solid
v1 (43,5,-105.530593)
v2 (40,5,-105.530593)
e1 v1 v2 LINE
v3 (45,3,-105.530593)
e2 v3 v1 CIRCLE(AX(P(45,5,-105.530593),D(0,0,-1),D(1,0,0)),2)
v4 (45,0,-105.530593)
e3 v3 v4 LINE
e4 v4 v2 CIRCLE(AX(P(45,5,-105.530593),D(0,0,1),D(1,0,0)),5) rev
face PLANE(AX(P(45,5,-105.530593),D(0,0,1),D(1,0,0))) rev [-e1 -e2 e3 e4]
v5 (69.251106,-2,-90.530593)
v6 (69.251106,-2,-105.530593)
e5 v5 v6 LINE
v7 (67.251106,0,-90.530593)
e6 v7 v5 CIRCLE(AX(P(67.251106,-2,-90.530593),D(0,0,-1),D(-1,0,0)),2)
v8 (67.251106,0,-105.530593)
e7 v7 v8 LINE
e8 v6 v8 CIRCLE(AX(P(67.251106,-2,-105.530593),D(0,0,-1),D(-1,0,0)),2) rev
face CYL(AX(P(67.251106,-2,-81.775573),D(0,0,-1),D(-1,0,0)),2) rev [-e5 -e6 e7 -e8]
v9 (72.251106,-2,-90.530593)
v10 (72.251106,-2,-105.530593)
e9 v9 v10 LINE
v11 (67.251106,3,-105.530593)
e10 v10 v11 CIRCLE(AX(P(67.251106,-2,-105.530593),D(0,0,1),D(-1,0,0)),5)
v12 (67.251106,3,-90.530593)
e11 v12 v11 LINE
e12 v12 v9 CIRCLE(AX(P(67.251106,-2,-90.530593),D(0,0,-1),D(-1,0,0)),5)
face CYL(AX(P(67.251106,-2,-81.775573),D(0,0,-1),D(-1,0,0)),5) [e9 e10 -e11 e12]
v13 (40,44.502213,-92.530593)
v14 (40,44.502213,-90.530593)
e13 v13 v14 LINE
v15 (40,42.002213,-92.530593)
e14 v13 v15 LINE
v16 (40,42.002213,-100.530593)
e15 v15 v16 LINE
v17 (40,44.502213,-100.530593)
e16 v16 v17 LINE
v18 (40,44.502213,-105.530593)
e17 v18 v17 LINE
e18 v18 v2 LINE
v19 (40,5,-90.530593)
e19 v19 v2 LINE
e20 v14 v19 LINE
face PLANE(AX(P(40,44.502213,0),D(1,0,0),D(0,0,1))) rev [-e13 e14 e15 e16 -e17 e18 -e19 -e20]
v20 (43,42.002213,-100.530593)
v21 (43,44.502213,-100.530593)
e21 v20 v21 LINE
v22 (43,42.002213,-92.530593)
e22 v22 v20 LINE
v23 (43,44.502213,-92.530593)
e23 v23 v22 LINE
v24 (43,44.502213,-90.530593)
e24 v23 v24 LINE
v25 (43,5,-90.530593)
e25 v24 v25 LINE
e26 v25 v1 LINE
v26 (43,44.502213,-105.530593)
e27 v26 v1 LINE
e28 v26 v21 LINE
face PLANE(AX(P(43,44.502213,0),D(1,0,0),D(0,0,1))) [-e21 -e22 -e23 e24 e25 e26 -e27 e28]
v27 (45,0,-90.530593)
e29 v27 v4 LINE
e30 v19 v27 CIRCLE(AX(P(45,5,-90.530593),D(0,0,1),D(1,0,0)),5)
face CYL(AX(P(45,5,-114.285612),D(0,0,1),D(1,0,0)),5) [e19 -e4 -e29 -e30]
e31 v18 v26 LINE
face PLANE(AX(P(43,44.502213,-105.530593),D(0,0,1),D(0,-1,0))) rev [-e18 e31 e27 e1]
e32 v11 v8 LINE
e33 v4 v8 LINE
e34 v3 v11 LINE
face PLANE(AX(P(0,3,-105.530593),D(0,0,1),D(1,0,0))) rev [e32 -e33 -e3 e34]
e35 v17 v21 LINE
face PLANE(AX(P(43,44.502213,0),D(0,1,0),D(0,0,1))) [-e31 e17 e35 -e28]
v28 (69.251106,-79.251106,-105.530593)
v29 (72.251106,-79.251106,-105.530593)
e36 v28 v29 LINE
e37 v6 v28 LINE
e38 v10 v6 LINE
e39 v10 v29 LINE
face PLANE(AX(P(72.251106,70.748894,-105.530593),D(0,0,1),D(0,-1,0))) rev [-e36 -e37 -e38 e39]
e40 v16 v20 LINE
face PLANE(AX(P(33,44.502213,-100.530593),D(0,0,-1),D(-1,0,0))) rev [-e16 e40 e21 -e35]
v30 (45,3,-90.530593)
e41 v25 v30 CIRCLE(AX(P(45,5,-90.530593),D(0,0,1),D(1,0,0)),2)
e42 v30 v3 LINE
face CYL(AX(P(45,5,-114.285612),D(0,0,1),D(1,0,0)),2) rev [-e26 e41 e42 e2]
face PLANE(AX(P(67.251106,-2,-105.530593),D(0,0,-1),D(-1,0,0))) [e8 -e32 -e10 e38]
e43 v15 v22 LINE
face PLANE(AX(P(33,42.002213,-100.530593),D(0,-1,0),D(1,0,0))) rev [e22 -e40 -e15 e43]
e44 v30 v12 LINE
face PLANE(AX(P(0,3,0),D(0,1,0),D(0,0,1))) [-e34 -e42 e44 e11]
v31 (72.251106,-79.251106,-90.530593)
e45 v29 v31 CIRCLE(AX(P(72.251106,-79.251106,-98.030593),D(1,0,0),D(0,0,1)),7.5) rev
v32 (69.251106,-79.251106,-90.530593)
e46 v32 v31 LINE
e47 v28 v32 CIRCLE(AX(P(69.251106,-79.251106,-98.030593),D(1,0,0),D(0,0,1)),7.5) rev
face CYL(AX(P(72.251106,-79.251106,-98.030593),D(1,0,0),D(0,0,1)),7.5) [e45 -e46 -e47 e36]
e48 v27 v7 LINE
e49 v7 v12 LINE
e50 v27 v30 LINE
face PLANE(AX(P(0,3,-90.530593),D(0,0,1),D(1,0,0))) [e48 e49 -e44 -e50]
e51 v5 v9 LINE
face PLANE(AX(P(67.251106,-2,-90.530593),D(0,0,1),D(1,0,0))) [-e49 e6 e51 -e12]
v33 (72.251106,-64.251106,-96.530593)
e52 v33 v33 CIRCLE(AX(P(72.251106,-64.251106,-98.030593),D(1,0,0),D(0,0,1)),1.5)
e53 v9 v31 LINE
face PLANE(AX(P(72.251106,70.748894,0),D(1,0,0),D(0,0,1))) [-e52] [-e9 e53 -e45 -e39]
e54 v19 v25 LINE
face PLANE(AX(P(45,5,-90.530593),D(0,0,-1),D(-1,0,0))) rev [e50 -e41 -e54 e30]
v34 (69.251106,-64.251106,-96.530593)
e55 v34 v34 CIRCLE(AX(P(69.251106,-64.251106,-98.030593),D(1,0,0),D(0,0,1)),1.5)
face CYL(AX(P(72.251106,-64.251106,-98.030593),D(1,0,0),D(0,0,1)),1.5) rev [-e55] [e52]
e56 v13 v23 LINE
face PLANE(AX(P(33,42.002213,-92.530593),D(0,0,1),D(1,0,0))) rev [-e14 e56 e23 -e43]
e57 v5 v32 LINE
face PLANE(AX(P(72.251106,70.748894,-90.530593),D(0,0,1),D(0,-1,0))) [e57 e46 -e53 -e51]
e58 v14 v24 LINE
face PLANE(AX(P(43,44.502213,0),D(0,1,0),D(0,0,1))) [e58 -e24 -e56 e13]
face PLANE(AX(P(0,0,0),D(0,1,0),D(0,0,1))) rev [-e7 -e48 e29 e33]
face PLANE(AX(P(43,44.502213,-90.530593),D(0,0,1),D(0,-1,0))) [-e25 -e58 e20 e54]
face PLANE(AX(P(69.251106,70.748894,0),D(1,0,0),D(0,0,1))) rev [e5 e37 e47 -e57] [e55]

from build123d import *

# Parameters (mm, degrees)
BOSS_EXTRUDE2_DEPTH        = 3
SKETCH5_R                  = 1.5
CUT_EXTRUDE3_DEPTH         = 3
SKETCHED_START             = 72.251106428
SKETCHED_BEND2_OUTLINE_W   = 3
SKETCHED_BEND2_OUTLINE_H   = 15
SKETCHED_BEND2_DEPTH       = 85.748893572
SKETCHED_START_2           = 69.251106428
SKETCHED_BEND2_2_OUTLINE_R = 1.5
SKETCHED_BEND2_2_DEPTH     = 2.5137
SKETCHED_START_3           = 67.251106428
SKETCHED_BEND2_3_OUTLINE_R = 1.5
SKETCHED_BEND2_3_DEPTH     = 5
SKETCHED_START_4           = -107
SKETCHED_BEND2_4_DEPTH     = 17
SKETCHED_START_5           = -105.530592626
SKETCHED_BEND3_DEPTH       = 15
SKETCHED_BEND3_2_DEPTH     = 15
SKETCH26_W                 = 8
SKETCH26_H                 = 2.5
CUT_EXTRUDE8_DEPTH         = 10


with BuildPart() as part:
    # Sketch1 → Boss-Extrude2 (new body)
    with BuildSketch(Plane(origin=(0, 0, 0), x_dir=(1, 0, 0), z_dir=(0, 1, 0))):
        with BuildLine():
            Line((150, 105.530592626), (0, 105.530592626))
            Line((0, 105.530592626), (0, 90.530592626))
            Line((0, 90.530592626), (103.25004789, 90.530592626))
            Line((103.25004789, 90.530592626), (150, 90.530592626))
            ThreePointArc((150, 90.530592626), (157.5, 98.030592626), (150, 105.530592626))
        make_face()
    extrude(amount=BOSS_EXTRUDE2_DEPTH)

    # Sketch5 → Cut-Extrude3 (cut)
    with BuildSketch(Plane(origin=(0, 3, 0), x_dir=(1, 0, 0), z_dir=(0, 1, 0))):
        with Locations(Location((135, 98.030592626, 0), (0, 0, 270))):
            Circle(SKETCH5_R)
    extrude(amount=-CUT_EXTRUDE3_DEPTH, mode=Mode.SUBTRACT)

    # Sketched Bend2: read off the stored shape, not the designer's step
    # Sketched Bend2 outline → Sketched Bend2 (cut)
    with BuildSketch(Plane.YZ.offset(SKETCHED_START)):
        with Locations((1.5, -98.030592626)):
            Rectangle(SKETCHED_BEND2_OUTLINE_W, SKETCHED_BEND2_OUTLINE_H)
    extrude(amount=SKETCHED_BEND2_DEPTH, mode=Mode.SUBTRACT)

    # Sketched Bend2 2 outline → Sketched Bend2 2 (add)
    with BuildSketch(Plane.YZ.offset(SKETCHED_START_2)):
        with BuildLine():
            Line((0, -90.530592626), (-79.251106428, -90.530592626))
            ThreePointArc((-79.251106428, -90.530592626), (-86.751106428, -98.030592626), (-79.251106428, -105.530592626))
            Line((-79.251106428, -105.530592626), (0, -105.530592626))
            Line((0, -105.530592626), (0, -90.530592626))
        make_face()
        with Locations((-64.251106428, -98.030592626)):
            Circle(SKETCHED_BEND2_2_OUTLINE_R, mode=Mode.SUBTRACT)
    extrude(amount=SKETCHED_BEND2_2_DEPTH)

    # Sketched Bend2 3 outline → Sketched Bend2 3 (add)
    with BuildSketch(Plane.YZ.offset(SKETCHED_START_3)):
        with BuildLine():
            Line((0, -90.530592626), (-79.251106428, -90.530592626))
            ThreePointArc((-79.251106428, -90.530592626), (-86.751106428, -98.030592626), (-79.251106428, -105.530592626))
            Line((-79.251106428, -105.530592626), (0, -105.530592626))
            Line((0, -105.530592626), (0, -90.530592626))
        make_face()
        with Locations((-64.251106428, -98.030592626)):
            Circle(SKETCHED_BEND2_3_OUTLINE_R, mode=Mode.SUBTRACT)
    extrude(amount=SKETCHED_BEND2_3_DEPTH)

    # Sketched Bend2 4 outline → Sketched Bend2 4 (cut)
    with BuildSketch(Plane.XY.offset(SKETCHED_START_4)):
        with BuildLine():
            Line((69.251106428, -88), (69.251106428, -2))
            ThreePointArc((69.251106428, -2), (68.66531999, -0.585786438), (67.251106428, 0))
            Line((67.251106428, 0), (67.251106428, -88))
            Line((67.251106428, -88), (69.251106428, -88))
        make_face()
        with BuildLine():
            Line((72.251106428, -2), (72.251106424, -88))
            Line((72.251106424, -88), (74, -88))
            Line((74, -88), (74, 4))
            Line((74, 4), (66, 4))
            Line((66, 4), (66, 3))
            Line((66, 3), (67.251106428, 3))
            ThreePointArc((67.251106428, 3), (70.786640334, 1.535533906), (72.251106428, -2))
        make_face()
    extrude(amount=SKETCHED_BEND2_4_DEPTH, mode=Mode.SUBTRACT)

    # Sketched Bend3: read off the stored shape, not the designer's step
    # Sketched Bend3 outline → Sketched Bend3 (cut)
    with BuildSketch(Plane.XY.offset(SKETCHED_START_5)):
        with BuildLine():
            ThreePointArc((45, 0), (42.261387212, 0.816699867), (40.417424305, 3))
            Line((40.417424305, 3), (0, 3))
            Line((0, 3), (0, 0))
            Line((0, 0), (45, 0))
        make_face()
    extrude(amount=SKETCHED_BEND3_DEPTH, mode=Mode.SUBTRACT)

    # Sketched Bend3 2 outline → Sketched Bend3 2 (add)
    with BuildSketch(Plane.XY.offset(SKETCHED_START_5)):
        with BuildLine():
            ThreePointArc((45, 3), (43.585786438, 3.585786438), (43, 5))
            Line((43, 5), (43, 44.502212856))
            Line((43, 44.502212856), (40, 44.502212856))
            Line((40, 44.502212856), (40, 5))
            ThreePointArc((40, 5), (40.105468435, 3.978451782), (40.417424305, 3))
            Line((40.417424305, 3), (45, 3))
        make_face()
    extrude(amount=SKETCHED_BEND3_2_DEPTH)

    # Sketch26 → Cut-Extrude8 (cut)
    with BuildSketch(Plane(origin=(43, 0, 0), x_dir=(0, 0, -1), z_dir=(1, 0, 0))):
        with Locations((96.530592626, 43.252212856)):
            Rectangle(SKETCH26_W, SKETCH26_H)
    extrude(amount=-CUT_EXTRUDE8_DEPTH, mode=Mode.SUBTRACT)


solid = part.part
